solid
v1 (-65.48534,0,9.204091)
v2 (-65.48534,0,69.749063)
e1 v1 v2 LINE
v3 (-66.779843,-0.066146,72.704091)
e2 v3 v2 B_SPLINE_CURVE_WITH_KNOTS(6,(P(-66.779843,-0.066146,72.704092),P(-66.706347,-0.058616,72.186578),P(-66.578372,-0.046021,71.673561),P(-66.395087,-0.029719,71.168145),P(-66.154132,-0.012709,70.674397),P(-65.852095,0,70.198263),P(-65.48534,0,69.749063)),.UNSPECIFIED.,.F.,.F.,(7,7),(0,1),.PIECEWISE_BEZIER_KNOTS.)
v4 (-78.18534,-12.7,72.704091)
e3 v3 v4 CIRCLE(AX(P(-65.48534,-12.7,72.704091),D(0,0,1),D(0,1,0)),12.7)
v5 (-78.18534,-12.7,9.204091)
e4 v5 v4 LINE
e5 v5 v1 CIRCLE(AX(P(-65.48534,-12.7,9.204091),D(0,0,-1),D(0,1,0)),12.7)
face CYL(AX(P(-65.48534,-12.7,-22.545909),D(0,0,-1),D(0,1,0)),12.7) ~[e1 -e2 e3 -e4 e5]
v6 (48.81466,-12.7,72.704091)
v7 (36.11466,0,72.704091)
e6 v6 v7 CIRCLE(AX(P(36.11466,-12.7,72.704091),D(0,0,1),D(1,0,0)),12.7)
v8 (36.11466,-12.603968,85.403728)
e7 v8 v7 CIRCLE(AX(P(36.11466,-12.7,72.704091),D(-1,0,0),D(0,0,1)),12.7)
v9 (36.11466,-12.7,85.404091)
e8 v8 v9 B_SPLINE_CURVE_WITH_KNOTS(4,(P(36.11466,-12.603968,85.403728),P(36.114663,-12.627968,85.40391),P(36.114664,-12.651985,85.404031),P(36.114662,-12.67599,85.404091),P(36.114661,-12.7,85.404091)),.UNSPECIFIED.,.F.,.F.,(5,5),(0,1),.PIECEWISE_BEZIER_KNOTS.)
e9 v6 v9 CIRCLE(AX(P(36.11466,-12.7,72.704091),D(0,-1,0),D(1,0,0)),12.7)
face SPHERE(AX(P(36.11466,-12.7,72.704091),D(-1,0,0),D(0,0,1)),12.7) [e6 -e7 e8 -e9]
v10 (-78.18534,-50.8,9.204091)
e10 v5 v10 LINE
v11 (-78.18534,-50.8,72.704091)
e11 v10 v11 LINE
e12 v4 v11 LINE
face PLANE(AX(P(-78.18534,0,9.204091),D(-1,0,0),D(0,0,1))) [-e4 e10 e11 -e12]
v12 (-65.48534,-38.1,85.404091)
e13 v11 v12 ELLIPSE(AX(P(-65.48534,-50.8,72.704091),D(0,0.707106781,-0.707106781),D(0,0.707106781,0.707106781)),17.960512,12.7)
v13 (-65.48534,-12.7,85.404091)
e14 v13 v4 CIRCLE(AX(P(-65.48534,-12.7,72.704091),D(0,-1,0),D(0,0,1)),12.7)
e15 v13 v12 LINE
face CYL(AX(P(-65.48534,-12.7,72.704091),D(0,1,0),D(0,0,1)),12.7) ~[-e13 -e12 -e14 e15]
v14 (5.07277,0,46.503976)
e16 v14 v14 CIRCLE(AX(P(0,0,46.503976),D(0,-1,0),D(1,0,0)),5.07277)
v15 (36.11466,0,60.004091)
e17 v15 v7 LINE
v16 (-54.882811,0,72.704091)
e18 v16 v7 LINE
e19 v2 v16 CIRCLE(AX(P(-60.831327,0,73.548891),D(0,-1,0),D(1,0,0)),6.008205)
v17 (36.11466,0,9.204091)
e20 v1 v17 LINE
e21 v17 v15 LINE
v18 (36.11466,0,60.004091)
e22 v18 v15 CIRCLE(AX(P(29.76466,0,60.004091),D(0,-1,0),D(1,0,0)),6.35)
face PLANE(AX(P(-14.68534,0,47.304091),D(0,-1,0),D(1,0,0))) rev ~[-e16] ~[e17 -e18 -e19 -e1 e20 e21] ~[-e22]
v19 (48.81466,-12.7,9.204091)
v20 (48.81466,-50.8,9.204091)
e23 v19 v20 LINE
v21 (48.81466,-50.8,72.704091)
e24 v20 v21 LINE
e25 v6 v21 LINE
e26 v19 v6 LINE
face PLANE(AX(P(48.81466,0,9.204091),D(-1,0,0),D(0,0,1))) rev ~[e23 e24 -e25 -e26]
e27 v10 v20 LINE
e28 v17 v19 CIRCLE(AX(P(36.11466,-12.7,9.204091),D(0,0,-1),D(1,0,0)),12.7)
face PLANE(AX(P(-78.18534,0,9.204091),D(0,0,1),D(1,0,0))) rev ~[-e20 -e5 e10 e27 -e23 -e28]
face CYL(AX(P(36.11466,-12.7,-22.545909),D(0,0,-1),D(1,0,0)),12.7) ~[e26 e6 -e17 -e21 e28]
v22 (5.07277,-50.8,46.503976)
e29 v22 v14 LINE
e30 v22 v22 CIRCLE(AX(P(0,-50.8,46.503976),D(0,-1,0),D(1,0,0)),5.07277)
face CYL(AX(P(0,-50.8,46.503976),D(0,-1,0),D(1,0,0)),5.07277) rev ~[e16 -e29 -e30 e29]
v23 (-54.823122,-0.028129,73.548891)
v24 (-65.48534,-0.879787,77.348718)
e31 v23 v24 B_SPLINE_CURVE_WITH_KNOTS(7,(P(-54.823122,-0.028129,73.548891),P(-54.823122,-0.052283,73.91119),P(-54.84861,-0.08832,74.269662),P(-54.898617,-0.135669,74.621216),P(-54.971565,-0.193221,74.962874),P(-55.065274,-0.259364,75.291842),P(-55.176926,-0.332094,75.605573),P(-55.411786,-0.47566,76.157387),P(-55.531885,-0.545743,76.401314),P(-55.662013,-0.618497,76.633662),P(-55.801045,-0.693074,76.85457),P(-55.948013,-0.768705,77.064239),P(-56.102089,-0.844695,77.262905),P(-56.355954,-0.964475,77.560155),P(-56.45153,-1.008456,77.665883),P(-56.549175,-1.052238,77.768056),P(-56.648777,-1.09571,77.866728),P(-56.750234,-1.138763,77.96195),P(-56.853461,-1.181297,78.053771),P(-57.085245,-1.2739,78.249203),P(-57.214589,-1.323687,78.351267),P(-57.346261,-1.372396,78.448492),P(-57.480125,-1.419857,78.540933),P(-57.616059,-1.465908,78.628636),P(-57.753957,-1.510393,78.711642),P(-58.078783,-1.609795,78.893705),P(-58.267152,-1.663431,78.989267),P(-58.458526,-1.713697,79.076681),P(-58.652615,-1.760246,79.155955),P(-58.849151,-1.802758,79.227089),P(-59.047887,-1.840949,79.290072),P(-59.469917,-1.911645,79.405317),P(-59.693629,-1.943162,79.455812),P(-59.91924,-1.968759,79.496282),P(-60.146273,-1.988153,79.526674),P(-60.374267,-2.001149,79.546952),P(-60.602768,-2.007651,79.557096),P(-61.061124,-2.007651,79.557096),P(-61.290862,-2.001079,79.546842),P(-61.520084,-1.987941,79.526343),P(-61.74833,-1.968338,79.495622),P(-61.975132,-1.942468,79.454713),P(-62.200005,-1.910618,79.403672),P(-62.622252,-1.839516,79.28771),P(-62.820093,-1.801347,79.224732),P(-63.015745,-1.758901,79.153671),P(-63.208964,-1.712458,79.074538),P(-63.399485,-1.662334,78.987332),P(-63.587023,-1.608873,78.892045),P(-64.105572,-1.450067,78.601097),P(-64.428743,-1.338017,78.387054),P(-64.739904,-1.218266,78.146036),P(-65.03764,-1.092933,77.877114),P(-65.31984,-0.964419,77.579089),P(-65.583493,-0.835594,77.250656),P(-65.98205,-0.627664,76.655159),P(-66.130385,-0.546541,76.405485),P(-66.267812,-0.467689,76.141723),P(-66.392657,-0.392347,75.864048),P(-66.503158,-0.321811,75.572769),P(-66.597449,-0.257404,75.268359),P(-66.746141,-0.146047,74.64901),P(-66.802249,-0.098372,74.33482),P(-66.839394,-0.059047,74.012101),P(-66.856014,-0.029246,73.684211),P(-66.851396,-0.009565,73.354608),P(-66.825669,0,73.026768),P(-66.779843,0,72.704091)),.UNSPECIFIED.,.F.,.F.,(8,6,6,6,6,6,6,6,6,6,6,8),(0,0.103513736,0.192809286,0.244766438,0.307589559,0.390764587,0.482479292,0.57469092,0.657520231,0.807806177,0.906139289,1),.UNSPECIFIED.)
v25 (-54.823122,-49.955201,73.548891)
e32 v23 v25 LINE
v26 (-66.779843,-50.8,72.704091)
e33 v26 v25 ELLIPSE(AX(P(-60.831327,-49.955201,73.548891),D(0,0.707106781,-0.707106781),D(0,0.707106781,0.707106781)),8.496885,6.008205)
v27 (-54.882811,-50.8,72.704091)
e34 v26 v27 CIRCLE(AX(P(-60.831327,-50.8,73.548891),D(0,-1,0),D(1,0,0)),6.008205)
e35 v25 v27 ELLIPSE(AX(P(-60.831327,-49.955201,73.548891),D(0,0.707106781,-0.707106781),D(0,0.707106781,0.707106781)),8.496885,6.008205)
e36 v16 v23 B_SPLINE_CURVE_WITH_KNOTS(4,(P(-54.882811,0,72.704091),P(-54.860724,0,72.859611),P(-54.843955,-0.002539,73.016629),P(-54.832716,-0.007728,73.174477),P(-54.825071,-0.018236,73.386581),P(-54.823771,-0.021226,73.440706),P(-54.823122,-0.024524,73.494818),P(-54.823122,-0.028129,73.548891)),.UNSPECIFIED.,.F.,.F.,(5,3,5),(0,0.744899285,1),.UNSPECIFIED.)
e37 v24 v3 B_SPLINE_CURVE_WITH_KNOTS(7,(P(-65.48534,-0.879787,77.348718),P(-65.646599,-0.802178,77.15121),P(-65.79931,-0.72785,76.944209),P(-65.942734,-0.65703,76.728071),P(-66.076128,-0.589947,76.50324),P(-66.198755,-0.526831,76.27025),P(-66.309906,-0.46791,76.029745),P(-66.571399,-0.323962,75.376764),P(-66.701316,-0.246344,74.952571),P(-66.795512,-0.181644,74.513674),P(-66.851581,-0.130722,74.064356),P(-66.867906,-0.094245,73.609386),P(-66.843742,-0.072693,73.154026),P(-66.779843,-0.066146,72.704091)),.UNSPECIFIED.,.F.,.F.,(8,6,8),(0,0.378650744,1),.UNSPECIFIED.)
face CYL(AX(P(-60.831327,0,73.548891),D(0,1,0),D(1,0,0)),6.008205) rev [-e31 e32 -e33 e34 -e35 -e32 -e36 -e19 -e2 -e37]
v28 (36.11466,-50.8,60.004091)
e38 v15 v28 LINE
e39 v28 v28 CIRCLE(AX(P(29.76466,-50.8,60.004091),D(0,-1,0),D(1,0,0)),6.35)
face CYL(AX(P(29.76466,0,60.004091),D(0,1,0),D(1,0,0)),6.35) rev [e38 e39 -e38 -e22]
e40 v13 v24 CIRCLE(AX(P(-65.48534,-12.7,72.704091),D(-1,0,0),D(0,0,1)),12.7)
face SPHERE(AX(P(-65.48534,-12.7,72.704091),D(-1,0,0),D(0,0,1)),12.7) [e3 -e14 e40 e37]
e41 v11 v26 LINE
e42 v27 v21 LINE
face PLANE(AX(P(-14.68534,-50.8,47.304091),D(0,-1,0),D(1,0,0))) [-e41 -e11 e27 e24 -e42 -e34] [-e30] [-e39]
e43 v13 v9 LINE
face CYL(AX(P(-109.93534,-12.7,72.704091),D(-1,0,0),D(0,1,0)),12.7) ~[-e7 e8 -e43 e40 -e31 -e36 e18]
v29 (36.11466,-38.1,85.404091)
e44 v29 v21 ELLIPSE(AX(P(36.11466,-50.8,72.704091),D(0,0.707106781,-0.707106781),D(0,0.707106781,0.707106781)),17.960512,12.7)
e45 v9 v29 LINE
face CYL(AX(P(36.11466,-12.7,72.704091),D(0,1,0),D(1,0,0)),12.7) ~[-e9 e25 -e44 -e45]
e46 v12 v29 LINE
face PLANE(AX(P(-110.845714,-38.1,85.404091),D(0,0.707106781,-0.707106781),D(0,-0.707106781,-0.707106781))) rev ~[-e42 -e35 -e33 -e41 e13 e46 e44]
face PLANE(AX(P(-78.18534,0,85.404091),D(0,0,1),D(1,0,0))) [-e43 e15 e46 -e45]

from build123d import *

# Parameters (mm, degrees)
F0_W        = 127
F0_H        = 76.2
F0_R        = 6.0082051914
F0_R_2      = 6.35
F1_DEPTH    = 50.8
F2_R        = 5.0727698676
F3_DEPTH    = 72.136
F4_T1_DEPTH = 192.3207478943
F5_T1_DEPTH = 190.5
F6_T1_DEPTH = 57.15
F6_T3_DEPTH = 95.25
F6_T6_ANGLE = 90.000000001
F6_T8_ANGLE = 90.000000001


# Not quite as in the source:
# - a fillet or chamfer that OpenCascade refuses, or shapes differently, is made with other operations: its cross-section is extruded or revolved along the edge and cut away or added


with BuildPart() as f1:
    # F0 (on Front) → F1 (new body)
    with BuildSketch(Plane.XZ):
        with Locations((-14.6853402257, 47.3040914883)):
            Rectangle(F0_W, F0_H)
        with Locations((-60.8313269913, 73.5488906503)):
            Circle(F0_R, mode=Mode.SUBTRACT)
        with Locations((29.7646597743, 60.0040914883)):
            Circle(F0_R_2, mode=Mode.SUBTRACT)
    extrude(amount=F1_DEPTH)

    # F2 (on face) → F3 (cut)
    with BuildSketch(Plane.XZ.offset(50.8)):
        with Locations((0, 46.5039759874)):
            Circle(F2_R)
    extrude(amount=-F3_DEPTH, mode=Mode.SUBTRACT)

    # F4: chamfer of 12.7 on 1 edges, made by hand

    # F4_s2 → F4_t1 (cut)
    with BuildSketch(Plane.YZ.offset(-110.8457141729)):
        Polygon((-38.1, 85.4040914883), (-50.8, 72.7040914883), (-50.8, 85.4040914883), align=None)
    extrude(amount=F4_T1_DEPTH, mode=Mode.SUBTRACT)

    # F5: fillet of radius 12.7 on 1 edges, made by hand

    # F5_s2 → F5_t1 (cut)
    with BuildSketch(Plane.YZ.offset(-109.9353402257)):
        with BuildLine():
            ThreePointArc((0, 72.7040914883), (-3.7197438789, 81.6843476094), (-12.7, 85.4040914883))
            Line((-12.7, 85.4040914883), (0, 85.4040914883))
            Line((0, 85.4040914883), (0, 72.7040914883))
        make_face()
    extrude(amount=F5_T1_DEPTH, mode=Mode.SUBTRACT)

    # F6: fillet of radius 12.7 on 2 edges, made by hand

    # F6_s2 → F6_t1 (cut)
    with BuildSketch(Plane.XZ.offset(12.7)):
        with BuildLine():
            ThreePointArc((-65.4853402257, 85.4040914883), (-74.4655963468, 81.6843476094), (-78.1853402257, 72.7040914883))
            Line((-78.1853402257, 72.7040914883), (-78.1853402257, 85.4040914883))
            Line((-78.1853402257, 85.4040914883), (-65.4853402257, 85.4040914883))
        make_face()
        with BuildLine():
            ThreePointArc((48.8146597743, 72.7040914883), (45.0949158954, 81.6843476094), (36.1146597743, 85.4040914883))
            Line((36.1146597743, 85.4040914883), (48.8146597743, 85.4040914883))
            Line((48.8146597743, 85.4040914883), (48.8146597743, 72.7040914883))
        make_face()
    extrude(amount=F6_T1_DEPTH, mode=Mode.SUBTRACT)

    # F6_s4 → F6_t3 (cut)
    with BuildSketch(Plane.XY.offset(-22.5459085117)):
        with BuildLine():
            ThreePointArc((48.8146597743, -12.7), (45.0949158954, -3.7197438789), (36.1146597743, 0))
            Line((36.1146597743, 0), (48.8146597743, 0))
            Line((48.8146597743, 0), (48.8146597743, -12.7))
        make_face()
        with BuildLine():
            ThreePointArc((-65.4853402257, 0), (-74.4655963468, -3.7197438789), (-78.1853402257, -12.7))
            Line((-78.1853402257, -12.7), (-78.1853402257, 0))
            Line((-78.1853402257, 0), (-65.4853402257, 0))
        make_face()
    extrude(amount=F6_T3_DEPTH, mode=Mode.SUBTRACT)

    # F6_s5 → F6_t6 (revolve, cut)
    with BuildSketch(Plane.XZ.offset(12.6999999999)):
        with BuildLine():
            ThreePointArc((48.8146597743, 72.7040914883), (45.0949158954, 81.6843476094), (36.1146597743, 85.4040914883))
            Line((36.1146597743, 85.4040914883), (48.8146597743, 85.4040914883))
            Line((48.8146597743, 85.4040914883), (48.8146597743, 72.7040914883))
        make_face()
    revolve(axis=Axis((48.8146597743, -12.6999999999, 72.7040914884), (-1, 0, 0)), revolution_arc=F6_T6_ANGLE, mode=Mode.SUBTRACT)

    # F6_s7 → F6_t8 (revolve, cut)
    with BuildSketch(Plane.XZ.offset(12.6999999999)):
        with BuildLine():
            ThreePointArc((-65.4853402257, 85.4040914883), (-74.4655963468, 81.6843476094), (-78.1853402257, 72.7040914883))
            Line((-78.1853402257, 72.7040914883), (-78.1853402257, 85.4040914883))
            Line((-78.1853402257, 85.4040914883), (-65.4853402257, 85.4040914883))
        make_face()
    revolve(axis=Axis((-78.1853402257, -12.6999999999, 72.7040914884), (-1, 0, 0)), revolution_arc=F6_T8_ANGLE, mode=Mode.SUBTRACT)


solid = f1.part
